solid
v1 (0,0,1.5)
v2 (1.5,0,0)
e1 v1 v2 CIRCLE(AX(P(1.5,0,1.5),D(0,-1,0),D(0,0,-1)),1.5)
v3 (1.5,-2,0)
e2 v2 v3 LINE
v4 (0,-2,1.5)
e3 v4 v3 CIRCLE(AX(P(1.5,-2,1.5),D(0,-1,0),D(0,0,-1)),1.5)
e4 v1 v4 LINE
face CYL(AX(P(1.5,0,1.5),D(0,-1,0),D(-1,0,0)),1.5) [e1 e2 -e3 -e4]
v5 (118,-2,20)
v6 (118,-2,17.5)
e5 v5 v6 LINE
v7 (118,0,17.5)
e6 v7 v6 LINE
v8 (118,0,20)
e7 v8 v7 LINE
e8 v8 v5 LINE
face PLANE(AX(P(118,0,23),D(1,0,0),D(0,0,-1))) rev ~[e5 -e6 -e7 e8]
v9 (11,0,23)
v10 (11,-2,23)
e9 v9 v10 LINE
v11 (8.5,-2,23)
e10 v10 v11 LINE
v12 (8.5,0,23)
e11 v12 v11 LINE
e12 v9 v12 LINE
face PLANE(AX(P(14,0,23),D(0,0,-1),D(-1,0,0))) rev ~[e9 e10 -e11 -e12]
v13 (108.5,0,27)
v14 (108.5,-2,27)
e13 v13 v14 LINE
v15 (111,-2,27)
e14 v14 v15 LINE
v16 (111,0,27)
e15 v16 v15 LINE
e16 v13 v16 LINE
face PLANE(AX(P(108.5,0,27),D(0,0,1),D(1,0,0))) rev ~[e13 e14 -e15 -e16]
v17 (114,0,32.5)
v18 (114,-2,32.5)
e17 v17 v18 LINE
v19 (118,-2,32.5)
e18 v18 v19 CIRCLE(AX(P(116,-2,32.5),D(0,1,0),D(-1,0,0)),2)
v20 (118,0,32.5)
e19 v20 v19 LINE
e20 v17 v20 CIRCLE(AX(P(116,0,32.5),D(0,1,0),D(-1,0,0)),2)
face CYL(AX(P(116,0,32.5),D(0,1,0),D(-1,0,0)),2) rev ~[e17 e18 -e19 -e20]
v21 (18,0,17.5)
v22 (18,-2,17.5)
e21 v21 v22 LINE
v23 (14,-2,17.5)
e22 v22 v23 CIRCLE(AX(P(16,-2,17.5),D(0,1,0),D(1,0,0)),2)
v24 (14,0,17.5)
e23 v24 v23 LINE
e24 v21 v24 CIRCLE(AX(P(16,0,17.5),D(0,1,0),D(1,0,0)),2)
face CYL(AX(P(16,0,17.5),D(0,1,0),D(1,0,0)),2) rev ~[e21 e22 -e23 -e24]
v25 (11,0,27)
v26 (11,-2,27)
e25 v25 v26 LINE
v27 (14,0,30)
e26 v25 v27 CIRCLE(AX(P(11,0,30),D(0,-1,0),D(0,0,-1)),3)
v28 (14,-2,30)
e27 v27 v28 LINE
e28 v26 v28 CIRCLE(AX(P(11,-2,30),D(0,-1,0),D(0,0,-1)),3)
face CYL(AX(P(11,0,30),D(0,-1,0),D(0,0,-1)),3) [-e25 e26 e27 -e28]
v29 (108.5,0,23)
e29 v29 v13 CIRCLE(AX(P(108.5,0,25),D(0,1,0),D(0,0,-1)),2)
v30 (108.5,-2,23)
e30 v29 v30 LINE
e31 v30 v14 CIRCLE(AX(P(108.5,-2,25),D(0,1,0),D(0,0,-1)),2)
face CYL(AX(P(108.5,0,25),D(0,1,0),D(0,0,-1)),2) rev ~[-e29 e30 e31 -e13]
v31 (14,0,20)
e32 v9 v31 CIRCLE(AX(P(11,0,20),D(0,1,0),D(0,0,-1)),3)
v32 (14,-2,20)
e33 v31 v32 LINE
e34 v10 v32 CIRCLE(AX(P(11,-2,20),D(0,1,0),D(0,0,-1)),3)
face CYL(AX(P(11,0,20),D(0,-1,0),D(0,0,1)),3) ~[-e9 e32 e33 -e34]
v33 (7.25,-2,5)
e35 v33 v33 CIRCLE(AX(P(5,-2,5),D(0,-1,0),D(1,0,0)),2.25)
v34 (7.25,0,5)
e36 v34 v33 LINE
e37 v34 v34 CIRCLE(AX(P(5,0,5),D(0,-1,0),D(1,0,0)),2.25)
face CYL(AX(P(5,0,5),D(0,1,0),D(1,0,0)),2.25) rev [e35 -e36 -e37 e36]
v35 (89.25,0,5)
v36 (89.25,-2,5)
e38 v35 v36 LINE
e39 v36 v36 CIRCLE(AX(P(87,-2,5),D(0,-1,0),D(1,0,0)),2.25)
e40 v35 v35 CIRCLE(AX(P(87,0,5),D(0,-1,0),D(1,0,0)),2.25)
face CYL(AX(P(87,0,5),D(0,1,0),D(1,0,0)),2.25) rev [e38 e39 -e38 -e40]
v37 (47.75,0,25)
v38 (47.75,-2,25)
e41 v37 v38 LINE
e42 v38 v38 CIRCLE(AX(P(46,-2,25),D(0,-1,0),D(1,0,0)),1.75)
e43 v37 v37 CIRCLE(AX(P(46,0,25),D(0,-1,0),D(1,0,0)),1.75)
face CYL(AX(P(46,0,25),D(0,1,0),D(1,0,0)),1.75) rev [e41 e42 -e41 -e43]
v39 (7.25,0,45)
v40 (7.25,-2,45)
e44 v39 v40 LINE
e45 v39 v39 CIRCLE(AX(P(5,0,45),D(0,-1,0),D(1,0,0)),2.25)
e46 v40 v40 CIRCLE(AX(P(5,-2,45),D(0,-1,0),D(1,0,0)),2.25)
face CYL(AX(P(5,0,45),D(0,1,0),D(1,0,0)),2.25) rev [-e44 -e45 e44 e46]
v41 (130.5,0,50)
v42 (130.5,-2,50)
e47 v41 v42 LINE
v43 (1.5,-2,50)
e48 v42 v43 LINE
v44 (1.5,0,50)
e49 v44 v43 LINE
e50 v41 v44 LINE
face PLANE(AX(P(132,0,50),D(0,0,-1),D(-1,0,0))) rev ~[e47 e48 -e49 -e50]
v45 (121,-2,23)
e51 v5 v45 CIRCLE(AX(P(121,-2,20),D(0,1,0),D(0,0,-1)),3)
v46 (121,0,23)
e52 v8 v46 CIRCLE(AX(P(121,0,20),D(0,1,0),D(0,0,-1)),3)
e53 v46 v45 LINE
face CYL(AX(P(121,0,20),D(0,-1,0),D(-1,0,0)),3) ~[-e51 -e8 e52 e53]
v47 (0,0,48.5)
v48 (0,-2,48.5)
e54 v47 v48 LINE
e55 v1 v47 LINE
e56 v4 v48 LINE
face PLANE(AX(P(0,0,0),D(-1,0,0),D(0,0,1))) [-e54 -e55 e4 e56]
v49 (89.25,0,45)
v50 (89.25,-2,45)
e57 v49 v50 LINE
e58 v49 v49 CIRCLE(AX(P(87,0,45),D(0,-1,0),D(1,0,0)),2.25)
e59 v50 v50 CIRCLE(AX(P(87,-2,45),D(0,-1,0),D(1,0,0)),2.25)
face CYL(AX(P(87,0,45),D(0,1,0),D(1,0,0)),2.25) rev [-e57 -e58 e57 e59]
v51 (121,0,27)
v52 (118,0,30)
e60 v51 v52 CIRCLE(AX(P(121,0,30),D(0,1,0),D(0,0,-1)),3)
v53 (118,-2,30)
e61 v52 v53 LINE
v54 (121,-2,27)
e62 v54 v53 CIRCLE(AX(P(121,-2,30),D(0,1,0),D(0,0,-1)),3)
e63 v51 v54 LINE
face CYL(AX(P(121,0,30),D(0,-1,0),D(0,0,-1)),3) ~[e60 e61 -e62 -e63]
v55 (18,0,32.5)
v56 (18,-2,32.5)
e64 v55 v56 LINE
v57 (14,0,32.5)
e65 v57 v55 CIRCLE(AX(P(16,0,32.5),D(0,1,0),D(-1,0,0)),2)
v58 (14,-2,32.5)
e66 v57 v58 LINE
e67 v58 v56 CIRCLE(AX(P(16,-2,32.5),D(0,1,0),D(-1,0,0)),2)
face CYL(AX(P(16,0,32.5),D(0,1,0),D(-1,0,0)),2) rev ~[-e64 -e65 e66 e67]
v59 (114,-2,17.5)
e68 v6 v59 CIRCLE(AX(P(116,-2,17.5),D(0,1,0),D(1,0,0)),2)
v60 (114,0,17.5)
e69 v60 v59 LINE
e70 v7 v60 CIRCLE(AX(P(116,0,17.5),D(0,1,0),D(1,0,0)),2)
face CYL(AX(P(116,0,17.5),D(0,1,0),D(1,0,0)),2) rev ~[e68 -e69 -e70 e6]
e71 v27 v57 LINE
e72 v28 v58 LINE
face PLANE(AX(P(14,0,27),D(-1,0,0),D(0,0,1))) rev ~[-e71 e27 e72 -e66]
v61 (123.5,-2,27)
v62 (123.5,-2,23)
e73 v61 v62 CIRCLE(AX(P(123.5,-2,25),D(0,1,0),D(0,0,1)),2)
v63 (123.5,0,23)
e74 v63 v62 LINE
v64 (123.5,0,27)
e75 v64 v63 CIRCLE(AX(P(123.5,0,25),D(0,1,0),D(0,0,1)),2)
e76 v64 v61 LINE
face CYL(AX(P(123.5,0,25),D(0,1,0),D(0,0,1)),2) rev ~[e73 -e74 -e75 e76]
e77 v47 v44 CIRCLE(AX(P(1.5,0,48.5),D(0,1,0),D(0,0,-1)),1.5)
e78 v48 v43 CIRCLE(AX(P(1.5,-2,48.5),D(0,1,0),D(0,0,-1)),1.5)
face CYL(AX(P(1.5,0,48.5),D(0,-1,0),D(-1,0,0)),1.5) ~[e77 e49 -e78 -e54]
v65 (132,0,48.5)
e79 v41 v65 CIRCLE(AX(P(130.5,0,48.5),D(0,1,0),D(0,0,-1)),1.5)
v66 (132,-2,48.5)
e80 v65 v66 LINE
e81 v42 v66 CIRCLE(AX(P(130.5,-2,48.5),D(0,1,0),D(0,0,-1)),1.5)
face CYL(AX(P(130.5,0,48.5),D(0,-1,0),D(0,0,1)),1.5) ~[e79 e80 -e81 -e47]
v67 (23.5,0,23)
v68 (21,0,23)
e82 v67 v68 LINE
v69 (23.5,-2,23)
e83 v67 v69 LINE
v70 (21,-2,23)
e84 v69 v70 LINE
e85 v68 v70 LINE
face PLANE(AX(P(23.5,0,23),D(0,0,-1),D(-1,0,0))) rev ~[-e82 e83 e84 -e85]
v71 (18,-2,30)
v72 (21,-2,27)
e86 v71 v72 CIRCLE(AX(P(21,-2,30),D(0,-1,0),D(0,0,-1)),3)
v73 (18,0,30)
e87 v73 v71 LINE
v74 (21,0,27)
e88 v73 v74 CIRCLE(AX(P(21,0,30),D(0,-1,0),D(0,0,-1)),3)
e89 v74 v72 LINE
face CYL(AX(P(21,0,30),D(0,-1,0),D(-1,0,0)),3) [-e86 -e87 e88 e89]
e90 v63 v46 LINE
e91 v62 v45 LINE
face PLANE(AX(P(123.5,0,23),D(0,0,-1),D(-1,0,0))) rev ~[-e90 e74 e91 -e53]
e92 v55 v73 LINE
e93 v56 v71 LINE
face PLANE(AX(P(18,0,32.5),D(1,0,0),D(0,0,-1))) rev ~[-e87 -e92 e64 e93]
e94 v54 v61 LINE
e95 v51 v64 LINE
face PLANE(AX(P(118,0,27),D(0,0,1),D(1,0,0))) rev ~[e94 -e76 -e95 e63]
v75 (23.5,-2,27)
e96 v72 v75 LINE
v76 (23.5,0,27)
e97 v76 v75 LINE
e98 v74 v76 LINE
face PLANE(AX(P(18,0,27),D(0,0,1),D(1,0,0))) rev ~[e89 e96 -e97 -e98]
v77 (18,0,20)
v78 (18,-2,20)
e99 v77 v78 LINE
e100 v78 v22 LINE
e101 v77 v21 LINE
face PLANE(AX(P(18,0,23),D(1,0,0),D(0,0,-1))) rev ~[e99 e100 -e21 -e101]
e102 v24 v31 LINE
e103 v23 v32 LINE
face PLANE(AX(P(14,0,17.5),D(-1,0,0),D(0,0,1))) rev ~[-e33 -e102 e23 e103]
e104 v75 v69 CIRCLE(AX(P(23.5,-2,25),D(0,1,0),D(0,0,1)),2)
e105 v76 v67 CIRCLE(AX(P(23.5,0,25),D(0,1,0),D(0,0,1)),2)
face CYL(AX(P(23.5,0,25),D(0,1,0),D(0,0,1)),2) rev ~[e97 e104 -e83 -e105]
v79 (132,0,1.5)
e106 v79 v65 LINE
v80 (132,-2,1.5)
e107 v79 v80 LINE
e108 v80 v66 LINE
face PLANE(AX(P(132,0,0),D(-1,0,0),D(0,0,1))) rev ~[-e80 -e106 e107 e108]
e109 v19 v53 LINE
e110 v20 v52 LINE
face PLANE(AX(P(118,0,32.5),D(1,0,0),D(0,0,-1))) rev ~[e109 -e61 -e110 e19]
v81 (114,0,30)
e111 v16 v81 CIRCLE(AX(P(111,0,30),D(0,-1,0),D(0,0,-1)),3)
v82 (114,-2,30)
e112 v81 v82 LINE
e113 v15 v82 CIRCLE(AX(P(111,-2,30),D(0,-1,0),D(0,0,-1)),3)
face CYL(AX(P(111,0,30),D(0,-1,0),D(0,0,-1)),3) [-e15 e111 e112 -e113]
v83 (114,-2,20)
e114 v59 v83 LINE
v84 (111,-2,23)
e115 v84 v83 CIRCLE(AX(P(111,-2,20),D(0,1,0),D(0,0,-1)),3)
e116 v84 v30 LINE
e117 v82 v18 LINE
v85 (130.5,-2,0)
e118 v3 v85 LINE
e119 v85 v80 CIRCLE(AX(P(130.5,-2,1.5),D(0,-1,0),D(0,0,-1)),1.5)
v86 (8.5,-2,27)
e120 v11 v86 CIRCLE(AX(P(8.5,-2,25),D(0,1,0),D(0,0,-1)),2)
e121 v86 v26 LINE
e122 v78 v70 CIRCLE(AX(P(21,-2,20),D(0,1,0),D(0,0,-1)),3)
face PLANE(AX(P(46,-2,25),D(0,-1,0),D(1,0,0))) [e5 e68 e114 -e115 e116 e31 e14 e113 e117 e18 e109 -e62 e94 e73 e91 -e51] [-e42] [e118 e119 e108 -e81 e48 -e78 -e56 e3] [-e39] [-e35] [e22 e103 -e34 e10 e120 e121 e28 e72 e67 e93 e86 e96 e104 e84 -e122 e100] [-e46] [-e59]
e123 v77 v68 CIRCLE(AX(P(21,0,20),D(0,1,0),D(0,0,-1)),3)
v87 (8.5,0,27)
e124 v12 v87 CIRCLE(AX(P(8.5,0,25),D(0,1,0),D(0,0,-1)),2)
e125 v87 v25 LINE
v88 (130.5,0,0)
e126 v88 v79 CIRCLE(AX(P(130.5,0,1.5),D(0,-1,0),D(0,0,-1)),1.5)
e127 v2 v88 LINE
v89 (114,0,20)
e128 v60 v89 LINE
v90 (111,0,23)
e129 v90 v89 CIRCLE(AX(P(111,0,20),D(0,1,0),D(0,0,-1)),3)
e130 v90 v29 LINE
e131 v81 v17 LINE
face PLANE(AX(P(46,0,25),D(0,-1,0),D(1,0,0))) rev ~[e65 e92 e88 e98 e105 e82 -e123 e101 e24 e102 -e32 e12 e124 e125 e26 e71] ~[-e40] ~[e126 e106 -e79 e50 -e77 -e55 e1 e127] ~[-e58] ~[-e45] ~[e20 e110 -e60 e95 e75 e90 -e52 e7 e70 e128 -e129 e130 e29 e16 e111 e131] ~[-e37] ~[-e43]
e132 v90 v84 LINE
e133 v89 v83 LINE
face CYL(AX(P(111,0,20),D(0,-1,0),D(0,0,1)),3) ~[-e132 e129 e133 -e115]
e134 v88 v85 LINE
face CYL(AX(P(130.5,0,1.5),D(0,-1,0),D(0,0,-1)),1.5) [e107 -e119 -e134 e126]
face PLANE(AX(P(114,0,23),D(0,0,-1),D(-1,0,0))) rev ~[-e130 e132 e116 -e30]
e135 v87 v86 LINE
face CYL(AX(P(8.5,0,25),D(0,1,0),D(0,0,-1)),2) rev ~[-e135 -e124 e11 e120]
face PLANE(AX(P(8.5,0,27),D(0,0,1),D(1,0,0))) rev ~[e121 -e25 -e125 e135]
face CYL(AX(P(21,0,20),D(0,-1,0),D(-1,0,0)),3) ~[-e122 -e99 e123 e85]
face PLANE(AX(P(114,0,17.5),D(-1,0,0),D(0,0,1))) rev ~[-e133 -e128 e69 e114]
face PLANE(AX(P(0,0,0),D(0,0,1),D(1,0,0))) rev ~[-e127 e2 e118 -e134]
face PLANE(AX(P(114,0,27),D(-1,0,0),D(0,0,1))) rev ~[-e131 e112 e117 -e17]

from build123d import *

# Parameters (mm, degrees)
F0_W     = 92
F0_H     = 50
F0_R     = 2.25
F0_R_2   = 1.75
F0_W_2   = 40
F1_DEPTH = 2
F2_R     = 3
F3_R     = 1.5


# Not quite as in the source:
# - a feature names something its author has since deleted; it is built from what else it names


with BuildPart() as f1:
    # F0 (on Front) → F1 (new body)
    with BuildSketch(Plane.XZ):
        with Locations((46, 25)):
            Rectangle(F0_W, F0_H)
        with Locations((5, 5)):
            Circle(F0_R, mode=Mode.SUBTRACT)
        with Locations((87, 5)):
            Circle(F0_R, mode=Mode.SUBTRACT)
        with BuildLine():
            Line((8.5, 27), (14, 27))
            Line((14, 27), (14, 32.5))
            ThreePointArc((14, 32.5), (16, 34.5), (18, 32.5))
            Line((18, 32.5), (18, 27))
            Line((18, 27), (23.5, 27))
            ThreePointArc((23.5, 27), (25.5, 25), (23.5, 23))
            Line((23.5, 23), (18, 23))
            Line((18, 23), (18, 17.5))
            ThreePointArc((18, 17.5), (16, 15.5), (14, 17.5))
            Line((14, 17.5), (14, 23))
            Line((14, 23), (8.5, 23))
            ThreePointArc((8.5, 23), (6.5, 25), (8.5, 27))
        make_face(mode=Mode.SUBTRACT)
        with Locations((46, 25)):
            Circle(F0_R_2, mode=Mode.SUBTRACT)
        with Locations((5, 45)):
            Circle(F0_R, mode=Mode.SUBTRACT)
        with Locations((87, 45)):
            Circle(F0_R, mode=Mode.SUBTRACT)
        with Locations((112, 25)):
            Rectangle(F0_W_2, F0_H)
        with BuildLine():
            Line((114, 27), (114, 32.5))
            ThreePointArc((114, 32.5), (116, 34.5), (118, 32.5))
            Line((118, 32.5), (118, 27))
            Line((118, 27), (123.5, 27))
            ThreePointArc((123.5, 27), (125.5, 25), (123.5, 23))
            Line((123.5, 23), (118, 23))
            Line((118, 23), (118, 17.5))
            ThreePointArc((118, 17.5), (116, 15.5), (114, 17.5))
            Line((114, 17.5), (114, 23))
            Line((114, 23), (108.5, 23))
            ThreePointArc((108.5, 23), (106.5, 25), (108.5, 27))
            Line((108.5, 27), (114, 27))
        make_face(mode=Mode.SUBTRACT)
    extrude(amount=F1_DEPTH)

    # F2
    f2_edges = [f1.edges().sort_by_distance(p)[0] for p in [
        (14, -1, 27),
        (14, -1, 23),
        (18, -1, 27),
        (18, -1, 23),
        (114, -1, 27),
        (118, -1, 27),
        (114, -1, 23),
        (118, -1, 23),
    ]]
    fillet(f2_edges, radius=F2_R)

    # F3
    f3_edges = [f1.edges().sort_by_distance(p)[0] for p in [
        (0, -1, 50),
        (0, -1, 0),
        (132, -1, 0),
        (132, -1, 50),
    ]]
    fillet(f3_edges, radius=F3_R)


solid = f1.part
